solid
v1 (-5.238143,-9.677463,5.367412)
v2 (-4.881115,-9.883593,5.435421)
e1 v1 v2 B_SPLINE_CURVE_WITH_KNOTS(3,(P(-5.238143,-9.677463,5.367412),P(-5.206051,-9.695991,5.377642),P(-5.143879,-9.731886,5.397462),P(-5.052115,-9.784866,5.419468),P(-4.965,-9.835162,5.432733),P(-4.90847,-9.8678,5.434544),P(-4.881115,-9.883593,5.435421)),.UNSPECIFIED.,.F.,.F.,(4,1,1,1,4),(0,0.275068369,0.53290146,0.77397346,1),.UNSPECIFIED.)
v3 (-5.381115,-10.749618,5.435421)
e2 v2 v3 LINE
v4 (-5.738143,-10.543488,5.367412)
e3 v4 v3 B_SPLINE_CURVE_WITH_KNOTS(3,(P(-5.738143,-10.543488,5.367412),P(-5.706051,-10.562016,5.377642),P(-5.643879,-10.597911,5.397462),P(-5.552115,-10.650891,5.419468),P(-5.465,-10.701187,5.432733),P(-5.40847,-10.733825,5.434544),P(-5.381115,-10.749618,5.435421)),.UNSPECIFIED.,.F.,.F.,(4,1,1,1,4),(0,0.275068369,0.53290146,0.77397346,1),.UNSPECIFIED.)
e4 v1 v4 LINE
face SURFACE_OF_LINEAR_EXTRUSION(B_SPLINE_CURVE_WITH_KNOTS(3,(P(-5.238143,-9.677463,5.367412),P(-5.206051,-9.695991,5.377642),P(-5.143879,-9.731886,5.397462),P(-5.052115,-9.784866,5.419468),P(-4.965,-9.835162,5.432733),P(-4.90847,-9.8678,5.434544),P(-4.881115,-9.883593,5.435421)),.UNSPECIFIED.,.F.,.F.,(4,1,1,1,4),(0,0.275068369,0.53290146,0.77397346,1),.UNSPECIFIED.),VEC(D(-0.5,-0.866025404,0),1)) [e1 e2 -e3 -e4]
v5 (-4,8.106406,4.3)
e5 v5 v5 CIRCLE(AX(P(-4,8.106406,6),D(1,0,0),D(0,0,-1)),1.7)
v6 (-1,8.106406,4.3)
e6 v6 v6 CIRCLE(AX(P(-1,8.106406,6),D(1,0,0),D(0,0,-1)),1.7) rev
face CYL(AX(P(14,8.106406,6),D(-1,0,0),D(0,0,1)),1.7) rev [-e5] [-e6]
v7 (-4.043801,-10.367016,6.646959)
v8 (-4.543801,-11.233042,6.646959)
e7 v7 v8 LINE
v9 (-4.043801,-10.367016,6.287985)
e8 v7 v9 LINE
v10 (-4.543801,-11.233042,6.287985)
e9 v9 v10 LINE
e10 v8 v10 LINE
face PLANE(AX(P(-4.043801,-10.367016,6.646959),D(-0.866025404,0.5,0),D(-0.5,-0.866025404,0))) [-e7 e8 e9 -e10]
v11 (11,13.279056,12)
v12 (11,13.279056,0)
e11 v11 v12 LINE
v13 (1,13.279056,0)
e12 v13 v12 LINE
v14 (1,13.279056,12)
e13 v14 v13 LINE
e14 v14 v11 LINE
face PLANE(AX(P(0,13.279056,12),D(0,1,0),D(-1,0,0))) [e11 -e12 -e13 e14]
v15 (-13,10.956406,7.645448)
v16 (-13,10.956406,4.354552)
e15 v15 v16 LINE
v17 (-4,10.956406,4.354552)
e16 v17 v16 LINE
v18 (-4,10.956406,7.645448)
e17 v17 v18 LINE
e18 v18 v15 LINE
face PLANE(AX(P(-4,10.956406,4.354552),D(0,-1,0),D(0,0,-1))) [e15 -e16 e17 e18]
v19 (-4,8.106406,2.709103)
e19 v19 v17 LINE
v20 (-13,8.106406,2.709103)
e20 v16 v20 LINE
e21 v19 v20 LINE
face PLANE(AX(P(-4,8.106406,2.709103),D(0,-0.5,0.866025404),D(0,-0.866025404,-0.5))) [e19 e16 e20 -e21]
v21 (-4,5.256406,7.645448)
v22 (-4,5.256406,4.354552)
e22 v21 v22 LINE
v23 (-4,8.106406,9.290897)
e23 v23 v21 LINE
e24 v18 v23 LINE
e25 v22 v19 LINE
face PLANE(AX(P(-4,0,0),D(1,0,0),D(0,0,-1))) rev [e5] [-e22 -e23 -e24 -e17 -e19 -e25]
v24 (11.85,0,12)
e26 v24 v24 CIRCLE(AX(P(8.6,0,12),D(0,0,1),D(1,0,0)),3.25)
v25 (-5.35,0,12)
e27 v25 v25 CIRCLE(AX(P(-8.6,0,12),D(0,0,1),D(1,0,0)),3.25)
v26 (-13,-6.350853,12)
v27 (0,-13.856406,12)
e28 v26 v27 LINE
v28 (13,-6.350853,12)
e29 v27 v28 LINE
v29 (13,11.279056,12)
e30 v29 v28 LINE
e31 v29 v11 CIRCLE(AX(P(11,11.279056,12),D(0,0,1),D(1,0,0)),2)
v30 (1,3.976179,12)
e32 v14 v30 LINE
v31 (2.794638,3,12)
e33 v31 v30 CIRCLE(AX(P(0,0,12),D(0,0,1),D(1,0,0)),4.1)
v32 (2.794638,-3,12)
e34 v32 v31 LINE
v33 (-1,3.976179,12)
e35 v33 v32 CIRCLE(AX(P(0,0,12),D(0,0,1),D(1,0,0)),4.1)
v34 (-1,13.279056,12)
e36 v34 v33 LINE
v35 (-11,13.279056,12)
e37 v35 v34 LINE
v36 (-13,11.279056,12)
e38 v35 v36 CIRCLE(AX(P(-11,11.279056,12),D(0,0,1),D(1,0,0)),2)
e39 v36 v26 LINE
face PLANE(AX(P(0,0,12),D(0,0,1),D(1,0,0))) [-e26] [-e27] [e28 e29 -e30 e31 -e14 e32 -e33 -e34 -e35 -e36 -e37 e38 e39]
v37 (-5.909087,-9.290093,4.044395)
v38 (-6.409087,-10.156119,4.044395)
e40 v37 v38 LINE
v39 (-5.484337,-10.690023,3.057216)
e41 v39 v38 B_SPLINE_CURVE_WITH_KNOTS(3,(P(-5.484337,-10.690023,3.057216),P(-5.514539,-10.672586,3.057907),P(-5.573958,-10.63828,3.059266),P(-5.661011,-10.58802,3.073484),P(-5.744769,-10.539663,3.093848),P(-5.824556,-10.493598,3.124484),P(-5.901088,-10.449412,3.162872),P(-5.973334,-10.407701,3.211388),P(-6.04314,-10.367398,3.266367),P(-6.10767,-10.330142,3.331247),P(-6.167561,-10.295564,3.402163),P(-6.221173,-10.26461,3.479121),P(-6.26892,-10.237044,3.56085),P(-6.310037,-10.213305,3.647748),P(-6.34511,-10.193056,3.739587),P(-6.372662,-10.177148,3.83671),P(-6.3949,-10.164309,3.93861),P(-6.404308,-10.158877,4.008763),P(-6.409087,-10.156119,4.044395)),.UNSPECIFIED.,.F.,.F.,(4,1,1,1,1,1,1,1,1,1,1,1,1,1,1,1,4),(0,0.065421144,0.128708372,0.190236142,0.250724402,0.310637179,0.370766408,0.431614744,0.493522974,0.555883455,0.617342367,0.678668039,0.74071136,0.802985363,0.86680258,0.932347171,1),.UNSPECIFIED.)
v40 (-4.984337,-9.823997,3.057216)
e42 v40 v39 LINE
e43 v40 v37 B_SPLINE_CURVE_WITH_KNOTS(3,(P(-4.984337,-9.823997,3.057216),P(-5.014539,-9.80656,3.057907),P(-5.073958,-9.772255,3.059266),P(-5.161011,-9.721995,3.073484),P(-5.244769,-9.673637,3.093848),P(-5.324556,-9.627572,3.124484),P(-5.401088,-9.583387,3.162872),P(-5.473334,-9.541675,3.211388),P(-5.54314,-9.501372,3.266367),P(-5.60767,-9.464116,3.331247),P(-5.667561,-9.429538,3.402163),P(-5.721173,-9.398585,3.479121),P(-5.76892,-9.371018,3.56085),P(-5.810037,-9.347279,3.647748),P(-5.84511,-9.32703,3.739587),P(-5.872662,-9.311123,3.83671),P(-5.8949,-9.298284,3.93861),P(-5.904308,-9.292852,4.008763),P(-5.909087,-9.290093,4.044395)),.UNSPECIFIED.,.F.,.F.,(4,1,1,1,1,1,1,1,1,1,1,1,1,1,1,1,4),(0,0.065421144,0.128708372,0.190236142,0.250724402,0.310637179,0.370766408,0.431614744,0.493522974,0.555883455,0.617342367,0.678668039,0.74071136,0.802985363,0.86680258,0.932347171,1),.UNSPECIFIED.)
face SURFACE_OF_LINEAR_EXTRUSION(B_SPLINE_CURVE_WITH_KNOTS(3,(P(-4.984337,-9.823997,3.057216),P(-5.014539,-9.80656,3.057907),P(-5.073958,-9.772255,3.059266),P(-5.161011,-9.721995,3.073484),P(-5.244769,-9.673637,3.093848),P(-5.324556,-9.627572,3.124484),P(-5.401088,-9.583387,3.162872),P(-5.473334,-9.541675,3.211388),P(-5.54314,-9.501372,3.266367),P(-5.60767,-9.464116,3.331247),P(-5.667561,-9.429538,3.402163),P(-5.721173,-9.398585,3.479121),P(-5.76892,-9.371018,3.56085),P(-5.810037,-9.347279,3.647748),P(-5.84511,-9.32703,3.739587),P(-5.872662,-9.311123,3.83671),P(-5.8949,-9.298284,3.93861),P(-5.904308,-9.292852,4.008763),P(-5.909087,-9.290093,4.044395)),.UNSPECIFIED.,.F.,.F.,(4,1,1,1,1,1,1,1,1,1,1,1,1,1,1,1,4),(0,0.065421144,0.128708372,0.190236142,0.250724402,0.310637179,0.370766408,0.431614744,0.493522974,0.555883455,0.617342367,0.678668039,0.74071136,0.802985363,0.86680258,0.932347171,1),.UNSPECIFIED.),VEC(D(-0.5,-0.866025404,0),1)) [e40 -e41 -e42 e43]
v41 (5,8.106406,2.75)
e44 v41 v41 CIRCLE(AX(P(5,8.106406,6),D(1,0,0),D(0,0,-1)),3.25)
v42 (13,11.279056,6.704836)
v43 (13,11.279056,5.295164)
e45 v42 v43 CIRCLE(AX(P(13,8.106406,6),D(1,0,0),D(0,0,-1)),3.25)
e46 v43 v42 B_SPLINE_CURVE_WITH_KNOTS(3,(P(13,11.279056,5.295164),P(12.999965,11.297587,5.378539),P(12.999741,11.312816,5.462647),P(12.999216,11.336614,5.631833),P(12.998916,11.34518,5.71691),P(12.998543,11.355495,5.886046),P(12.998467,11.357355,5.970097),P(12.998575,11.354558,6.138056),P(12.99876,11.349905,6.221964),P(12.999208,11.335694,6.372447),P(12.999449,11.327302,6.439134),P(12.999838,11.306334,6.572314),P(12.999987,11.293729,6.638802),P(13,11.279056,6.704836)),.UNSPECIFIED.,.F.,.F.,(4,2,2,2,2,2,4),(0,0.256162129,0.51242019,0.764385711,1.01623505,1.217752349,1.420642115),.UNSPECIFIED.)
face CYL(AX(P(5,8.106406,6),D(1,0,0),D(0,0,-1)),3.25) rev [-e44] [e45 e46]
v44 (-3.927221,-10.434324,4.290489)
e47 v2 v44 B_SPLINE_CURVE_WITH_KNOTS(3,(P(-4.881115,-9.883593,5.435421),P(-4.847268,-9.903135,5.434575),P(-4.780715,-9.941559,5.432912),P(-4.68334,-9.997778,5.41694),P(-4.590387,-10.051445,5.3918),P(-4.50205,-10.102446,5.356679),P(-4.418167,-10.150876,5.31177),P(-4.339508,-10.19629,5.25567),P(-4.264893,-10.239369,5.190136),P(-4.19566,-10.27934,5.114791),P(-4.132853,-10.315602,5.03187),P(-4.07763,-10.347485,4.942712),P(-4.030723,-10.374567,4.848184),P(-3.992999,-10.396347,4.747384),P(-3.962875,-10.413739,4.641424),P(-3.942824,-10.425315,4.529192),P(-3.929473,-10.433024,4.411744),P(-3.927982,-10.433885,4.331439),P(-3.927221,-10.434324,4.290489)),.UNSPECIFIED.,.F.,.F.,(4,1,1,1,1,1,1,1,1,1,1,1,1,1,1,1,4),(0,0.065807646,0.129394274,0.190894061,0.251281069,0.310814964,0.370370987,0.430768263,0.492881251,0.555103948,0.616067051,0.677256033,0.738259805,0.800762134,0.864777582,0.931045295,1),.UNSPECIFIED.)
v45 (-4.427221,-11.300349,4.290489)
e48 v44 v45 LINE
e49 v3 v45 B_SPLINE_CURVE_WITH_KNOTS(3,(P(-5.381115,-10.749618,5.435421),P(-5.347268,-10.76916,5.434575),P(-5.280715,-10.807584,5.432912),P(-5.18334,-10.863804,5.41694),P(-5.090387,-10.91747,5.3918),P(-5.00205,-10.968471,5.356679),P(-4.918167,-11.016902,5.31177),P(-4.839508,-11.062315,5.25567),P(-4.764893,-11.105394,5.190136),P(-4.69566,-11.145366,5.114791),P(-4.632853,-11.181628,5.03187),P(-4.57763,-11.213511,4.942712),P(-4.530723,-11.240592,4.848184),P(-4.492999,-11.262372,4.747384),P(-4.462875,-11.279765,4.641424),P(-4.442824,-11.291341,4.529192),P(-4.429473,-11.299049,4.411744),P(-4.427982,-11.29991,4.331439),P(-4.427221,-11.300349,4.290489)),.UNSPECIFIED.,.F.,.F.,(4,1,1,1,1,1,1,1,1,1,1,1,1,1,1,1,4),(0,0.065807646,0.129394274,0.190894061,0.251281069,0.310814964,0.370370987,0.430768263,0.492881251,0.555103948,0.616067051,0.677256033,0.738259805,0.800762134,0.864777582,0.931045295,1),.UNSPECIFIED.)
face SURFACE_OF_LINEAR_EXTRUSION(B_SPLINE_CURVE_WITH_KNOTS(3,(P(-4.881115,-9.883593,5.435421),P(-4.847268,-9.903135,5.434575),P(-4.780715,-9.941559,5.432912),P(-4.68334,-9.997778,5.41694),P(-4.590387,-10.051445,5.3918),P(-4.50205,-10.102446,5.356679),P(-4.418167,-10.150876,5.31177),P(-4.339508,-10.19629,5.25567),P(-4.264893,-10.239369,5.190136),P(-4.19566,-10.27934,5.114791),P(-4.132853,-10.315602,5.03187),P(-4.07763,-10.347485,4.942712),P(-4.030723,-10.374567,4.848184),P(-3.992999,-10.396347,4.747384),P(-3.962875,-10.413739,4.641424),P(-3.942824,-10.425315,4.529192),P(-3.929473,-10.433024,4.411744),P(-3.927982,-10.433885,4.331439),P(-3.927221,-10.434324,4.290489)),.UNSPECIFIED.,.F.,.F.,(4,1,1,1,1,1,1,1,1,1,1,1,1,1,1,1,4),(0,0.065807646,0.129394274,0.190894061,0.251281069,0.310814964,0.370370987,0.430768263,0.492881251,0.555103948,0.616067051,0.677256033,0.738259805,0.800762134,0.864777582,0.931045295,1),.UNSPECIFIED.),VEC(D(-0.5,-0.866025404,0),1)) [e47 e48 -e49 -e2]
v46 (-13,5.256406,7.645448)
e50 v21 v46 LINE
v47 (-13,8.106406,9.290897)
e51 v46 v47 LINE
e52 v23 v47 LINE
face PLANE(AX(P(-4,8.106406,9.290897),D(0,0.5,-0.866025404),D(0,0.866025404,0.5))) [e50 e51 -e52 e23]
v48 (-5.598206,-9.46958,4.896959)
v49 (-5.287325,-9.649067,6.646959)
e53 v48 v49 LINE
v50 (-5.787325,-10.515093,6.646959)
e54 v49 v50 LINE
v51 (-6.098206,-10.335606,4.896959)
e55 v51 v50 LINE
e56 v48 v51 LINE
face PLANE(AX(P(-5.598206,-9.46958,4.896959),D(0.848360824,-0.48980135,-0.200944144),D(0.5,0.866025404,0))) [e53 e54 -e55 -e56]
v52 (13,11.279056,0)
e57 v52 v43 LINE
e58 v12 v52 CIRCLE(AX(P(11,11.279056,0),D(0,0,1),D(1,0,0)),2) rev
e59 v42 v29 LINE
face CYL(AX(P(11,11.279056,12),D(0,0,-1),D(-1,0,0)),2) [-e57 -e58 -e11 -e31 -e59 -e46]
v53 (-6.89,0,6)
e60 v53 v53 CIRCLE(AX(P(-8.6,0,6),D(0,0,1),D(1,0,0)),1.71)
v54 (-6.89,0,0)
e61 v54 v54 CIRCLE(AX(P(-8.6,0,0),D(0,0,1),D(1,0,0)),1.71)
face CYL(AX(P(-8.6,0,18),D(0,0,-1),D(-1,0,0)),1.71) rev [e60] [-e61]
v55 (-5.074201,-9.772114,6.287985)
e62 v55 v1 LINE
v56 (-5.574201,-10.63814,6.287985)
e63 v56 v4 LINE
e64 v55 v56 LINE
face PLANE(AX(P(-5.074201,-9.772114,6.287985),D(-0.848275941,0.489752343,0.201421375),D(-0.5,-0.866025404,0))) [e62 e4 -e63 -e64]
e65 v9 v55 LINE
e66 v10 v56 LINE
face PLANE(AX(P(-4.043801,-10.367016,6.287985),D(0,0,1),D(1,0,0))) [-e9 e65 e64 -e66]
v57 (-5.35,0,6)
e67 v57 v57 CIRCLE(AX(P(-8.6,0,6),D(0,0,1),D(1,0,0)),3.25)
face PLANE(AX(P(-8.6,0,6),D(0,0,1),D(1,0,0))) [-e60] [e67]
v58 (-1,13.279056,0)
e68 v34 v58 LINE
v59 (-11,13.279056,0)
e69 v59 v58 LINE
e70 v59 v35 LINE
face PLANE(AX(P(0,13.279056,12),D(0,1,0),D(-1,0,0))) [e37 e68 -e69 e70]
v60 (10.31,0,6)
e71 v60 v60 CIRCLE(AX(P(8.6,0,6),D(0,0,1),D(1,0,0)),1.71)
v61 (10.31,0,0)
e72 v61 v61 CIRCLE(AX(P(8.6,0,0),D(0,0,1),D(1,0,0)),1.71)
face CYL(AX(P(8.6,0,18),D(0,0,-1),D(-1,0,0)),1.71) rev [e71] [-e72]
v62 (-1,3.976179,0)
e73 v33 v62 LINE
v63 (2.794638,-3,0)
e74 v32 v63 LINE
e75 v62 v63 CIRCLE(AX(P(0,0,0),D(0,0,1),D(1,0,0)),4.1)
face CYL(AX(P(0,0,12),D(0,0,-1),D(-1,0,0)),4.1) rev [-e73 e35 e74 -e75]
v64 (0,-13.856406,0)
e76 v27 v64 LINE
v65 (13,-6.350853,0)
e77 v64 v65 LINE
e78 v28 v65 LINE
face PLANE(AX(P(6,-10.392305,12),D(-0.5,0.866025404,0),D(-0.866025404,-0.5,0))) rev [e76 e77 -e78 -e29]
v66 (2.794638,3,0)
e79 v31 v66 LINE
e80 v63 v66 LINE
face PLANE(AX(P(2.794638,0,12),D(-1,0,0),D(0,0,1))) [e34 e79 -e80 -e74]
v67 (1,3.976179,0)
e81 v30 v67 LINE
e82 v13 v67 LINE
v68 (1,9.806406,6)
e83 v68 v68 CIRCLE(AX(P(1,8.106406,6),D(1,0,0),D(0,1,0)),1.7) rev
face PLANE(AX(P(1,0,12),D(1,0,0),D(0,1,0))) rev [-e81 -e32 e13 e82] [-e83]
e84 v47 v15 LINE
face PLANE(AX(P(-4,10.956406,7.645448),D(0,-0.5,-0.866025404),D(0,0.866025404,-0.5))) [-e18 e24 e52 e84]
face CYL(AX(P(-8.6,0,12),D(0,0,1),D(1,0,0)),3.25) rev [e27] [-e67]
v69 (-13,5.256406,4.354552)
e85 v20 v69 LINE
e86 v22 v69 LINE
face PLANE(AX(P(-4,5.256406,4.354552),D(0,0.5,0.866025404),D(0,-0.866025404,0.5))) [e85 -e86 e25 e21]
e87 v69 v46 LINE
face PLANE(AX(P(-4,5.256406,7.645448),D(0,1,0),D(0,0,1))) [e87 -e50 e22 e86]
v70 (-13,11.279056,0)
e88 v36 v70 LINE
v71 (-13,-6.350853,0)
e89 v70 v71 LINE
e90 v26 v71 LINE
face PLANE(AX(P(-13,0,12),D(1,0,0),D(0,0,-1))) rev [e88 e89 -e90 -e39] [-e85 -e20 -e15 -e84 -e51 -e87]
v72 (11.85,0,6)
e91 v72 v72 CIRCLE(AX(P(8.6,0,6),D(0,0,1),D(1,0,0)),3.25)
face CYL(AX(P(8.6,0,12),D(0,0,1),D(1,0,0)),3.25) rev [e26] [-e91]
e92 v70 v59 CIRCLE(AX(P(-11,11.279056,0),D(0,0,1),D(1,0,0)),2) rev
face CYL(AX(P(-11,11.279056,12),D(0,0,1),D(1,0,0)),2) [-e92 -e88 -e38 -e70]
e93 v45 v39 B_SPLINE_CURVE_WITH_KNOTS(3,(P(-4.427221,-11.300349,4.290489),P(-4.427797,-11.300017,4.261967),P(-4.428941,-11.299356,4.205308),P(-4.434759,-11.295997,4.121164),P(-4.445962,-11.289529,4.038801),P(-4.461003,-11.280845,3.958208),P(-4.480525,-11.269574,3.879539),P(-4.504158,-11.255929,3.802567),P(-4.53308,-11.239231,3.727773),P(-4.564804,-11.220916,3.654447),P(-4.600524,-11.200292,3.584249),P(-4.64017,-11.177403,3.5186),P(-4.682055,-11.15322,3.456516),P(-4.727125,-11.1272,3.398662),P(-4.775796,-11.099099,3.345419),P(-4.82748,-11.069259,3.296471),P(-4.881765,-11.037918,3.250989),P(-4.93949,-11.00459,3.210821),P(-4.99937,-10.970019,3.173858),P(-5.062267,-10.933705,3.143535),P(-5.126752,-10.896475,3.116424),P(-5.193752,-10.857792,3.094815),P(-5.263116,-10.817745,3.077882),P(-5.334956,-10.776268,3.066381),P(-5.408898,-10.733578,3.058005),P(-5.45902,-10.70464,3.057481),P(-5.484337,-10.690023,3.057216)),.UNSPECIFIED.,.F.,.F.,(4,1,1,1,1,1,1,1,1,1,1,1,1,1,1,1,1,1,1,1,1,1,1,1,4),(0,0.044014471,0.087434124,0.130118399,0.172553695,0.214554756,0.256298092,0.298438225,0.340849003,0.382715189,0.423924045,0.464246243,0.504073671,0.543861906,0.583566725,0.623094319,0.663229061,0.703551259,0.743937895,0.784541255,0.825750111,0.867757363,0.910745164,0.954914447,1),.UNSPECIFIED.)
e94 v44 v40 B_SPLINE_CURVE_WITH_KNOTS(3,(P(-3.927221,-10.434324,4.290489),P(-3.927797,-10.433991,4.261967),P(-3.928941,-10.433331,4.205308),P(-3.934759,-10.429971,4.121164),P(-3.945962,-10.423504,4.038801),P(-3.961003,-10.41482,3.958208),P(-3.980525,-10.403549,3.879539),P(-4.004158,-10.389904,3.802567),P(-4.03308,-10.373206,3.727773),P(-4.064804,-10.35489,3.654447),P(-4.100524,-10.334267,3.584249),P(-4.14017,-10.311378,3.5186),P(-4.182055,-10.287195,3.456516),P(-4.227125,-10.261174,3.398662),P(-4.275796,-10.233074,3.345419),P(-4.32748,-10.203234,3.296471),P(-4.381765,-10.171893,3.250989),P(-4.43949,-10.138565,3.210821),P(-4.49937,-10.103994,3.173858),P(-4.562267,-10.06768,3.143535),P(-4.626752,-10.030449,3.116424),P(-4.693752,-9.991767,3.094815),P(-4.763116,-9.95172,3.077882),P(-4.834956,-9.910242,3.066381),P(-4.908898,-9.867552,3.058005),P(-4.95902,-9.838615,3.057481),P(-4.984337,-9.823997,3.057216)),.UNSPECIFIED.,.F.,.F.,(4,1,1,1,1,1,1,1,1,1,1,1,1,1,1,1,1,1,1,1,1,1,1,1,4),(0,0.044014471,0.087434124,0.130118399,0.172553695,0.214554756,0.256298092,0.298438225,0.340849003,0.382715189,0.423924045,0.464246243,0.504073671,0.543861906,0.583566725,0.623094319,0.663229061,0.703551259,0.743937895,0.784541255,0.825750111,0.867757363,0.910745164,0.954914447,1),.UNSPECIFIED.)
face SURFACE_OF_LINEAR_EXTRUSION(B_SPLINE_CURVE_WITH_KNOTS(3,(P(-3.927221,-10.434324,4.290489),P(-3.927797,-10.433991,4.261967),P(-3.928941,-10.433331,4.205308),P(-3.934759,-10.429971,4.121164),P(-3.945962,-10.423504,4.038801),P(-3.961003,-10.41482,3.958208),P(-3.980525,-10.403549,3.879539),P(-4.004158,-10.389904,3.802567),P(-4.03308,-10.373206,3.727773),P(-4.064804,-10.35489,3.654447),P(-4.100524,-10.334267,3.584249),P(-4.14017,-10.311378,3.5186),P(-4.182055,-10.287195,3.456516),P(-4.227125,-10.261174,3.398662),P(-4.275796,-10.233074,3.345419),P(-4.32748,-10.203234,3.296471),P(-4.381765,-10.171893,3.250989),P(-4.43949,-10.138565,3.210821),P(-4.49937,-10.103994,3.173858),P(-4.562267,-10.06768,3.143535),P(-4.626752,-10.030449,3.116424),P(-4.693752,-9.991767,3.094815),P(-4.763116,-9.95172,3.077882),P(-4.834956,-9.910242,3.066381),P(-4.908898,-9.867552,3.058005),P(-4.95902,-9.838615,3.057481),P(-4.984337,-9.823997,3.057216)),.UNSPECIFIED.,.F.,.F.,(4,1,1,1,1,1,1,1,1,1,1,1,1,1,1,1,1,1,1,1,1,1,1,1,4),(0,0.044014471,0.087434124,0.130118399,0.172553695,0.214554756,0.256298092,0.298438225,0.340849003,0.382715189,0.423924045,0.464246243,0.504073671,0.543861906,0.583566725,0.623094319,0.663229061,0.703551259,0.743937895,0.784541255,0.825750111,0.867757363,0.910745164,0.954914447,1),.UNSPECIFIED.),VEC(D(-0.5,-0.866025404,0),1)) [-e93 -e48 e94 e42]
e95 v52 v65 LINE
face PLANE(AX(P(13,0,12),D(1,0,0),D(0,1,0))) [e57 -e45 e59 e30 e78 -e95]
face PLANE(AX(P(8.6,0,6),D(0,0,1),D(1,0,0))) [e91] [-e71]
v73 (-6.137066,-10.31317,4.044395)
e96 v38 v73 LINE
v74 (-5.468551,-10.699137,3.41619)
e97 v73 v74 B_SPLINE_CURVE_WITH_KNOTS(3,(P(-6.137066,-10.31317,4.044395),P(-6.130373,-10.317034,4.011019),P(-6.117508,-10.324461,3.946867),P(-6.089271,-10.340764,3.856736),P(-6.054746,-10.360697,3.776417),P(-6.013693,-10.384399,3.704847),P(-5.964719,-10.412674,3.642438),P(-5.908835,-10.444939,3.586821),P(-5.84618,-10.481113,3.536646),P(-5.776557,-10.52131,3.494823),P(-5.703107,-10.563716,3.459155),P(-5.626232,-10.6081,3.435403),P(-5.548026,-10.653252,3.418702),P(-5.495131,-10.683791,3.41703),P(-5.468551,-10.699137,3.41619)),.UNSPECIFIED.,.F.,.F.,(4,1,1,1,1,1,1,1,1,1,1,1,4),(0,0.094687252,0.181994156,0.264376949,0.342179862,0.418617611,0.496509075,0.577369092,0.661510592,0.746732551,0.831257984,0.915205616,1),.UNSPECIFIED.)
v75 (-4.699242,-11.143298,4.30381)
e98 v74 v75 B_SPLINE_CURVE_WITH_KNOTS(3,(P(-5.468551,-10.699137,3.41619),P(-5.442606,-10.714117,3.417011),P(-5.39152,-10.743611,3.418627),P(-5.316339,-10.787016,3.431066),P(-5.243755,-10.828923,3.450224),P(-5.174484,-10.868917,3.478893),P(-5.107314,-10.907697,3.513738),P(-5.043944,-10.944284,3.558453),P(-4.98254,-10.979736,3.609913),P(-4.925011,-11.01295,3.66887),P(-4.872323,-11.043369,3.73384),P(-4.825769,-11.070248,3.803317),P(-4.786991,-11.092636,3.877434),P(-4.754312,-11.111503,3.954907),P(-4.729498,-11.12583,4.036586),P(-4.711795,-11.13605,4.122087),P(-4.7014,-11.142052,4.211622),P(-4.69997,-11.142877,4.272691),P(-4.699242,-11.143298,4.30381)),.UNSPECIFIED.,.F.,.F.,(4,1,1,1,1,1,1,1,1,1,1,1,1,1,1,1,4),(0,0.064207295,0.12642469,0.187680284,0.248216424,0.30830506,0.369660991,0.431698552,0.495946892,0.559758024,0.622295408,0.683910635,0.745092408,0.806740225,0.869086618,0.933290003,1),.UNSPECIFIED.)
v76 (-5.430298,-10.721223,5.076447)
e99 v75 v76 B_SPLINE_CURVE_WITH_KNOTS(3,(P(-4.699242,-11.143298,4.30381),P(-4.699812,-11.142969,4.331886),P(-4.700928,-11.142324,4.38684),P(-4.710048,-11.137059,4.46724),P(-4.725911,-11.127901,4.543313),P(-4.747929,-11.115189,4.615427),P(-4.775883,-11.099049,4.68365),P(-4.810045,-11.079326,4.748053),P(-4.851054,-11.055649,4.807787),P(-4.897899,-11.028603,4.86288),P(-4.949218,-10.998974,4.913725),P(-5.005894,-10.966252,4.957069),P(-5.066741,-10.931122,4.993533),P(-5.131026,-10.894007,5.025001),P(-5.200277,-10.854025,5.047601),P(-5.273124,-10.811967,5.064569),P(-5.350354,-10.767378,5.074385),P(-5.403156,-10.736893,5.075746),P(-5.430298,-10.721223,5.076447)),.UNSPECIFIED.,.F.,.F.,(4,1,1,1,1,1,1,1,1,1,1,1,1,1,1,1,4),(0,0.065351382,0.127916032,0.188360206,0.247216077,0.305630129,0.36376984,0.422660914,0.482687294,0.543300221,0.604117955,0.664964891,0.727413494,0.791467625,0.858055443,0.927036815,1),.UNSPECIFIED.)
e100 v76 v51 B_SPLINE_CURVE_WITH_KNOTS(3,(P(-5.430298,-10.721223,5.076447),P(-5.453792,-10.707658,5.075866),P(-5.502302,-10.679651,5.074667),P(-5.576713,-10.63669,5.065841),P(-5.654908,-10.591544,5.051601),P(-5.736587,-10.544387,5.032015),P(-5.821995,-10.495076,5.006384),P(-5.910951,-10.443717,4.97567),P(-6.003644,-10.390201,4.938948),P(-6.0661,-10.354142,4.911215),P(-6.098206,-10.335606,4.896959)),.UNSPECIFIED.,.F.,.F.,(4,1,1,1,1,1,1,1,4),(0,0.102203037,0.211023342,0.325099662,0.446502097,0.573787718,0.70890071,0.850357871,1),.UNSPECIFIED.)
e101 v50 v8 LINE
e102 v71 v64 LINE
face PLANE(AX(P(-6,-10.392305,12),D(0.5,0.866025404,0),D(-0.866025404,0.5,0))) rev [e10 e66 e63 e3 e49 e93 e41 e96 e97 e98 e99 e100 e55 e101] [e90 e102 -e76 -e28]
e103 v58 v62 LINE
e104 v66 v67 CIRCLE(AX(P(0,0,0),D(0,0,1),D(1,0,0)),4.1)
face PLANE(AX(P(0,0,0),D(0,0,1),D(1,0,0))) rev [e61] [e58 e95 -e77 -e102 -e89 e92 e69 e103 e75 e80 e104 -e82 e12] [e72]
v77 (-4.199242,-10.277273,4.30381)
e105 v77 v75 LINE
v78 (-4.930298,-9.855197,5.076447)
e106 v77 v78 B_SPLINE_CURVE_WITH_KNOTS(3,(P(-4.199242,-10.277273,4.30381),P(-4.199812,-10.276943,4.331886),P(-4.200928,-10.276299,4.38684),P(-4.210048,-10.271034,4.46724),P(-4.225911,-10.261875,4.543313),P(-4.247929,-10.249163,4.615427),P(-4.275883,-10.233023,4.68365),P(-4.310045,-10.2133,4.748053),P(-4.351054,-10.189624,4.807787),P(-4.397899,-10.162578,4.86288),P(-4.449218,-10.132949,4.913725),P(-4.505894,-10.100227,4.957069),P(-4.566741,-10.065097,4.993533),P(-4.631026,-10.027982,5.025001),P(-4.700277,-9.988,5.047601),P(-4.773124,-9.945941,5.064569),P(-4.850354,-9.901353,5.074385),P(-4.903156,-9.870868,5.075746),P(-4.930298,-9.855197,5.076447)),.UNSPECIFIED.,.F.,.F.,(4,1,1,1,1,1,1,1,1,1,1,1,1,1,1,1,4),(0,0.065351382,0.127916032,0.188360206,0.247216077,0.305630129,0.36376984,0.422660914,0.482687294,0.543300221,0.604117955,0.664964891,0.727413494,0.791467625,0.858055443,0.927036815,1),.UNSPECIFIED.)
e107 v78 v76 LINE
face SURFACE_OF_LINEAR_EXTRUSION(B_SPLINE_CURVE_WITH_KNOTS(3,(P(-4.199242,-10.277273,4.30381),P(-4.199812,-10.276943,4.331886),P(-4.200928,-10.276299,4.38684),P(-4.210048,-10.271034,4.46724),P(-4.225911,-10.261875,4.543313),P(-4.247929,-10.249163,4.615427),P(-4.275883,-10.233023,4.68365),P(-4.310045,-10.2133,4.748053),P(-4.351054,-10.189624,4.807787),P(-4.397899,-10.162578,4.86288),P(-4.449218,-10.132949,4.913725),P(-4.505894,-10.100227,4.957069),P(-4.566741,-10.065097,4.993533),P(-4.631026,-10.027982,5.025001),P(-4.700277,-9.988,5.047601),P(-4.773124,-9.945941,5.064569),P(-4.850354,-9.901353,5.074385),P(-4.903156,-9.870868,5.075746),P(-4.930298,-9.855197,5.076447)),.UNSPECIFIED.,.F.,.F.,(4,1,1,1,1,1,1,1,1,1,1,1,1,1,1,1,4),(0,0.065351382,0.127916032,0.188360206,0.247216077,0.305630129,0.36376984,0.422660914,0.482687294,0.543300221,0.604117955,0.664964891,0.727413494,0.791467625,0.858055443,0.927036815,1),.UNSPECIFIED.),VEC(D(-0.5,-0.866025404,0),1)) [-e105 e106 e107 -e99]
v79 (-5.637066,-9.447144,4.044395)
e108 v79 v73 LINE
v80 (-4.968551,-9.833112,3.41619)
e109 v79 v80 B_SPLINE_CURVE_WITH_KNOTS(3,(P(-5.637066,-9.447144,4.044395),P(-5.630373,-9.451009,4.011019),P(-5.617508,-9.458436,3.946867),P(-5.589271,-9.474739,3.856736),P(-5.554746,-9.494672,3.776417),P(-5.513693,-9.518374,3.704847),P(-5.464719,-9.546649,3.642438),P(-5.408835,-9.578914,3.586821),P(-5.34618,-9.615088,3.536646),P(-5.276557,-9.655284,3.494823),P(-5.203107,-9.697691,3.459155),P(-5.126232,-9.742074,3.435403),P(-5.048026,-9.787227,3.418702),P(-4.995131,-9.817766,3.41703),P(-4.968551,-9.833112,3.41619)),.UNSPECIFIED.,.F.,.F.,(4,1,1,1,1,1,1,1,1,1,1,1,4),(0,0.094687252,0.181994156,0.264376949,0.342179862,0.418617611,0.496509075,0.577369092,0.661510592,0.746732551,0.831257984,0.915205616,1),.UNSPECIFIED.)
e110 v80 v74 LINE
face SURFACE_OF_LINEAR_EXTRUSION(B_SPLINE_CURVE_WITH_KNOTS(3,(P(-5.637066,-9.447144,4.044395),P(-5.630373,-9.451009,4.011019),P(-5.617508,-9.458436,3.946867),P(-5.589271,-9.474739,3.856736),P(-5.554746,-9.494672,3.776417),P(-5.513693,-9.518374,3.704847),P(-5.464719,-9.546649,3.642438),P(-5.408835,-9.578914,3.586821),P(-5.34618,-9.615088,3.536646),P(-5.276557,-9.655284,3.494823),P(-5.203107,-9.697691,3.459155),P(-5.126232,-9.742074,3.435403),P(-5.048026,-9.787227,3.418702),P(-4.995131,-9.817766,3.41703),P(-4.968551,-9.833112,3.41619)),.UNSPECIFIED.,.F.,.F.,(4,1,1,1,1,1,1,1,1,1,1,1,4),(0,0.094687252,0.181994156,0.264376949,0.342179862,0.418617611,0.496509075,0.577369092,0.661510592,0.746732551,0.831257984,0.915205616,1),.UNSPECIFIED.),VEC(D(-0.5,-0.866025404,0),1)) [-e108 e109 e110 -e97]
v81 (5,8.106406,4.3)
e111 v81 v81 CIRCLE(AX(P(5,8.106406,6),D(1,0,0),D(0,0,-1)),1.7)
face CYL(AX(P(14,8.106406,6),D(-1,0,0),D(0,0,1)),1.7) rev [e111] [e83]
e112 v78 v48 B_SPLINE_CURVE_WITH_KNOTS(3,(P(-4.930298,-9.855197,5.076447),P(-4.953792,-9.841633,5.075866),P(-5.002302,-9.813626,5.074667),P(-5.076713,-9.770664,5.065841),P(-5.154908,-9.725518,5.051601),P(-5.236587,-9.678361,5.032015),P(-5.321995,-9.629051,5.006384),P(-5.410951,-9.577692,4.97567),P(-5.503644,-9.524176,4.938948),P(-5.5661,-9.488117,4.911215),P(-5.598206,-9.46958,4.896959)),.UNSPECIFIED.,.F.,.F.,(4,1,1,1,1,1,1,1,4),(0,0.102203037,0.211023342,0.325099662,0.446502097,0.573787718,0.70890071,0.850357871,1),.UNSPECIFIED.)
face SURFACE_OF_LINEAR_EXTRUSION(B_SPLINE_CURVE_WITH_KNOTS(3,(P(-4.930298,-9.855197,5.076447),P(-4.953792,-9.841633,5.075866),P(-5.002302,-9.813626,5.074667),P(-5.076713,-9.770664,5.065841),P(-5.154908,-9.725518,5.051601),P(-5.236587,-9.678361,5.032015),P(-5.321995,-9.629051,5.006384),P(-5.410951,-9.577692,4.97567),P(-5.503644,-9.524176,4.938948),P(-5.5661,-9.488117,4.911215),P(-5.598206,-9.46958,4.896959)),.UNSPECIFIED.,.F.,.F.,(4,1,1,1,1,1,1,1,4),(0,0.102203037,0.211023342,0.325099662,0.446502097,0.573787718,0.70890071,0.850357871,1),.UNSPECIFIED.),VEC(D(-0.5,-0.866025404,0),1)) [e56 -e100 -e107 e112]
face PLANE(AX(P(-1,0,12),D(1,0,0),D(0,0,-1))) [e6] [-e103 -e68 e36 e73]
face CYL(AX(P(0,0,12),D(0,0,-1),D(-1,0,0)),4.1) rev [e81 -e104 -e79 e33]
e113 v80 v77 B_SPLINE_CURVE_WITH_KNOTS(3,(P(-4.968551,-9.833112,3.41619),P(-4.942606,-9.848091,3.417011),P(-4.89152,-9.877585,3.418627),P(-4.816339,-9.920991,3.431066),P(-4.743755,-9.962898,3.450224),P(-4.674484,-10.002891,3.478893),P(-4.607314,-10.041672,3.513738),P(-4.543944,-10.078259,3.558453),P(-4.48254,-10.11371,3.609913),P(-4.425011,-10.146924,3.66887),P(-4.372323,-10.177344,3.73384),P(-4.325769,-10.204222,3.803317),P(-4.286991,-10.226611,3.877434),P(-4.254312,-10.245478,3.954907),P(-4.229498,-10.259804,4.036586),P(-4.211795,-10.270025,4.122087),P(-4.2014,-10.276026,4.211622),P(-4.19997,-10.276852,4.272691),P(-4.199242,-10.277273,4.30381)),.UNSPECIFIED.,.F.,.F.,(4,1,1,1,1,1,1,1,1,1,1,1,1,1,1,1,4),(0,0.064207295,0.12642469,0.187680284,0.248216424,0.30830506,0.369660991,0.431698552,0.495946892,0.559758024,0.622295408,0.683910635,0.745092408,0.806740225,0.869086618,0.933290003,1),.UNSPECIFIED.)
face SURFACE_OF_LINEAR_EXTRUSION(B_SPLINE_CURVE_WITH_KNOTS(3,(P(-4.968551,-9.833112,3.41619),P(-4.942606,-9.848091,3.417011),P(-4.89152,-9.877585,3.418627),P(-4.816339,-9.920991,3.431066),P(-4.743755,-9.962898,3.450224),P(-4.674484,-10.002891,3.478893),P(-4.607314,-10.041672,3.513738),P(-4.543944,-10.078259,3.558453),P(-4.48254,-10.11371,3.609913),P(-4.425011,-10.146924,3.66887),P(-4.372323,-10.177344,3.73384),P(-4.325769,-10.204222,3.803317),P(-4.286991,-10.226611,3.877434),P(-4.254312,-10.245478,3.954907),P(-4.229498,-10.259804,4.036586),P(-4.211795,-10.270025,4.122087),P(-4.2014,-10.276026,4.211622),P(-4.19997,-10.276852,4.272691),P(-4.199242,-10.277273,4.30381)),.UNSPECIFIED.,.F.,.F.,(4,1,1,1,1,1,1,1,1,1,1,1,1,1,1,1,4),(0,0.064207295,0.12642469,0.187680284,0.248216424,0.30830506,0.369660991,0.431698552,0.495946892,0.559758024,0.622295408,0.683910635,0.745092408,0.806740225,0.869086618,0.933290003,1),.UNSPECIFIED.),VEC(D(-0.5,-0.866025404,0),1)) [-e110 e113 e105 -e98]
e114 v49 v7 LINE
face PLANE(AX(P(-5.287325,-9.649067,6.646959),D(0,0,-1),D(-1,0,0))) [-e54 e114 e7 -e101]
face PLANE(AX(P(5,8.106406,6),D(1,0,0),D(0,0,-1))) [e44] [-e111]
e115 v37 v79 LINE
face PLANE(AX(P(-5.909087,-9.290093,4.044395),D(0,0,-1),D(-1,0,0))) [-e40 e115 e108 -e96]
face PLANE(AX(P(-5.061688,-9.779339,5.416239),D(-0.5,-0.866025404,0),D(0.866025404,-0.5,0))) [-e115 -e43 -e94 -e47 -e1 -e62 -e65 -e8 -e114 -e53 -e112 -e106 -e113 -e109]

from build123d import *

# Parameters (mm, degrees)
BOSS_EXTRUDE1_DEPTH            = 12
SKETCH41_R                     = 1.71
CUT_EXTRUDE7_DEPTH             = 18
CBORE_FOR_M3_SHCS1_D           = 3.4
CBORE_FOR_M3_SHCS1_CBORE_D     = 6.5
CBORE_FOR_M3_SHCS1_CBORE_DEPTH = 3
CBORE_FOR_M3_SHCS2_D           = 3.4
CBORE_FOR_M3_SHCS2_CBORE_D     = 6.5
CBORE_FOR_M3_SHCS2_CBORE_DEPTH = 3
CUT_EXTRUDE10_DEPTH            = 15
CUT_EXTRUDE10_DEPTH_BACK       = 15
SKETCH52_R                     = 1.7
SKETCH58_R                     = 3.25
CUT_EXTRUDE11_DEPTH            = 8
CUT_EXTRUDE12_DEPTH            = 4
CUT_EXTRUDE12_DEPTH_BACK       = 6
FILLET1_R                      = 2
SKETCH61_R                     = 3.25
CUT_EXTRUDE13_DEPTH            = 6
CUT_EXTRUDE14_DEPTH            = 1


with BuildPart() as part:
    # Sketch1 → Boss-Extrude1 (new body)
    with BuildSketch(Plane(origin=(0, 0, 0), x_dir=(0, 1, 0), z_dir=(0, 0, 1))):
        with BuildLine():
            Line((-6.350852961, -13), (13.279056191, -13))
            Line((13.279056191, -13), (13.279056191, -1))
            Line((13.279056191, -1), (3.97617907, -1))
            ThreePointArc((3.97617907, -1), (3.601659304, -1.959094244), (3, -2.794637722))
            Line((3, -2.794637722), (-3, -2.794637722))
            ThreePointArc((-3, -2.794637722), (-3.815101571, -1.501665742), (-4.1, 0))
            ThreePointArc((-4.1, 0), (-0.503818326, 4.06892702), (3.97617907, 1))
            Line((3.97617907, 1), (13.279056191, 1))
            Line((13.279056191, 1), (13.279056191, 13))
            Line((13.279056191, 13), (-6.350852961, 13))
            Line((-6.350852961, 13), (-13.856406461, 0))
            Line((-13.856406461, 0), (-6.350852961, -13))
        make_face()
    extrude(amount=BOSS_EXTRUDE1_DEPTH)

    # Sketch41 → Cut-Extrude7 (cut)
    with BuildSketch(Plane(origin=(0, 0, 0), x_dir=(0, 1, 0), z_dir=(0, 0, 1))):
        with Locations(Location((0, 8.6, 0), (0, 0, 270))):
            Circle(SKETCH41_R)
        with Locations(Location((0, -8.6, 0), (0, 0, 270))):
            Circle(SKETCH41_R)
    extrude(amount=CUT_EXTRUDE7_DEPTH, mode=Mode.SUBTRACT)

    # CBORE for M3 SHCS1 (through all)
    with Locations(Plane(origin=(-8.6, 0, 12), x_dir=(1, 0, 0), z_dir=(0, 0, 1))):
        with Locations((0, 0)):
            CounterBoreHole(CBORE_FOR_M3_SHCS1_D / 2, CBORE_FOR_M3_SHCS1_CBORE_D / 2, CBORE_FOR_M3_SHCS1_CBORE_DEPTH)

    # CBORE for M3 SHCS2 (through all)
    with Locations(Plane(origin=(8.6, 0, 12), x_dir=(1, 0, 0), z_dir=(0, 0, 1))):
        with Locations((0, 0)):
            CounterBoreHole(CBORE_FOR_M3_SHCS2_D / 2, CBORE_FOR_M3_SHCS2_CBORE_D / 2, CBORE_FOR_M3_SHCS2_CBORE_DEPTH)

    # Sketch52 → Cut-Extrude10 (cut, two sides: drawn at the far end of the back side and taken through both)
    with BuildSketch(Plane.YZ.offset(-1).offset(-CUT_EXTRUDE10_DEPTH_BACK)):
        with Locations((8.106406461, 6)):
            Circle(SKETCH52_R)
    extrude(amount=CUT_EXTRUDE10_DEPTH + CUT_EXTRUDE10_DEPTH_BACK, mode=Mode.SUBTRACT)

    # Sketch58 → Cut-Extrude11 (cut)
    with BuildSketch(Plane.YZ.offset(13)):
        with Locations(Location((8.106406461, 6, 0), (0, 0, 270))):
            Circle(SKETCH58_R)
    extrude(amount=-CUT_EXTRUDE11_DEPTH, mode=Mode.SUBTRACT)

    # Sketch60 → Cut-Extrude12 (cut, two sides: drawn at the far end of the back side and taken through both)
    with BuildSketch(Plane.YZ.offset(-8).offset(-CUT_EXTRUDE12_DEPTH_BACK)):
        Polygon((8.106406461, 2.709103466), (10.956406461, 4.354551733), (10.956406461, 7.645448267), (8.106406461, 9.290896534), (5.256406461, 7.645448267), (5.256406461, 4.354551733), align=None)
    extrude(amount=CUT_EXTRUDE12_DEPTH + CUT_EXTRUDE12_DEPTH_BACK, mode=Mode.SUBTRACT)

    # Fillet1
    # the kernel refuses this fillet: 2 mm, written as the material it takes off along each edge
    with BuildSketch(Plane(origin=(13, 13.279056191, -5), x_dir=(0, -1, 0), z_dir=(0, 0, 1))) as fillet1_piece_1:
        with BuildLine():
            CenterArc((FILLET1_R, -FILLET1_R), FILLET1_R, 90, 90)
            Line((0, -FILLET1_R), (0, 0))
            Line((0, 0), (FILLET1_R, 0))
        make_face()
    extrude(amount=22, mode=Mode.SUBTRACT)
    with BuildSketch(Plane(origin=(-13, 13.279056191, -5), x_dir=(0, -1, 0), z_dir=(0, 0, 1))) as fillet1_piece_2:
        with BuildLine():
            CenterArc((FILLET1_R, FILLET1_R), FILLET1_R, 180, 90)
            Line((0, FILLET1_R), (0, 0))
            Line((0, 0), (FILLET1_R, 0))
        make_face()
    extrude(amount=22, mode=Mode.SUBTRACT)

    # Sketch61 → Cut-Extrude13 (cut)
    with BuildSketch(Plane(origin=(0, 0, 12), x_dir=(0, 1, 0), z_dir=(0, 0, 1))):
        with Locations(Location((0, 8.6, 0), (0, 0, 270))):
            Circle(SKETCH61_R)
        with Locations(Location((0, -8.6, 0), (0, 0, 270))):
            Circle(SKETCH61_R)
    extrude(amount=-CUT_EXTRUDE13_DEPTH, mode=Mode.SUBTRACT)

    # Sketch62 → Cut-Extrude14 (cut)
    with BuildSketch(Plane(origin=(-6, -10.392304845, 0), x_dir=(0.8660254037844386, -0.5000000000000001, 0), z_dir=(-0.5000000000000001, -0.8660254037844386, 0))):
        with BuildLine():
            Line((1.681473513, 6.646959362), (1.681473513, 6.287985003))
            Line((1.681473513, 6.287985003), (0.491669827, 6.287985003))
            Line((0.491669827, 6.287985003), (0.302366943, 5.367412086))
            add(Edge.make_bspline(
                [(0.302366943, 5.367412086), (0.339422817, 5.377642358), (0.411212713, 5.397461892), (0.517172574, 5.419467662), (0.617764777, 5.432733106), (0.683040148, 5.434544417), (0.714626558, 5.435420901)],
                knots=[0, 0, 0, 0, 1.100273476, 2.13160584, 3.095893838, 4, 4, 4, 4], degree=3))
            add(Edge.make_bspline(
                [(0.714626558, 5.435420901), (0.753710298, 5.434574965), (0.830558695, 5.432911644), (0.942997642, 5.416939795), (1.050330535, 5.39179988), (1.152332906, 5.356679358), (1.249193456, 5.311769625), (1.340021018, 5.255669685), (1.426178931, 5.190136353), (1.506121525, 5.114791341), (1.578645833, 5.031869725), (1.642411822, 4.942711854), (1.696574413, 4.848184192), (1.740135168, 4.747383583), (1.774919502, 4.641424429), (1.798071497, 4.529191847), (1.813488206, 4.411743727), (1.815210592, 4.331439157), (1.816088898, 4.29048901)],
                knots=[0, 0, 0, 0, 1.052922333, 2.070308379, 3.05430497, 4.020497103, 4.973039431, 5.925935799, 6.892292201, 7.88610001, 8.88166317, 9.857072816, 10.836096531, 11.812156883, 12.81219415, 13.836441305, 14.89672472, 16, 16, 16, 16], degree=3))
            add(Edge.make_bspline(
                [(1.816088898, 4.29048901), (1.815423823, 4.261966789), (1.81410266, 4.205307802), (1.807384072, 4.121163601), (1.794448356, 4.038800768), (1.777080632, 3.958208376), (1.754538214, 3.879539004), (1.72724916, 3.802567476), (1.693853133, 3.727772869), (1.657221758, 3.654447474), (1.61597528, 3.584248967), (1.570196772, 3.51859998), (1.521831281, 3.456515699), (1.469789896, 3.398661966), (1.4135889, 3.345418948), (1.353908934, 3.296470667), (1.291226215, 3.250989336), (1.224570972, 3.210821141), (1.155428489, 3.173858185), (1.082800272, 3.143534648), (1.008339572, 3.116424119), (0.930974696, 3.094814592), (0.850880883, 3.077882037), (0.767926108, 3.066381437), (0.682545438, 3.058004999), (0.624670425, 3.057480642), (0.595435853, 3.057215772)],
                knots=[0, 0, 0, 0, 1.056347294, 2.098418968, 3.122841568, 4.141288669, 5.149314143, 6.15115421, 7.162517403, 8.180376062, 9.185164535, 10.17417709, 11.141909838, 12.097768115, 13.052685741, 14.0056014, 14.954263652, 15.917497458, 16.885230207, 17.854509472, 18.828990115, 19.81800267, 20.826176721, 21.857883937, 22.917946725, 24, 24, 24, 24], degree=3))
            add(Edge.make_bspline(
                [(0.595435853, 3.057215772), (0.560561672, 3.05790661), (0.491950842, 3.059265752), (0.391430275, 3.073484238), (0.294715669, 3.093848154), (0.202585568, 3.124484424), (0.114214304, 3.162871719), (0.030791586, 3.21138789), (-0.04981419, 3.266366994), (-0.124326227, 3.331247347), (-0.19348234, 3.402163029), (-0.255388849, 3.47912067), (-0.310522426, 3.560850112), (-0.358000173, 3.647748266), (-0.398498194, 3.739586797), (-0.430313182, 3.836709798), (-0.455991537, 3.938609802), (-0.466854958, 4.008763312), (-0.472372641, 4.04439526)],
                knots=[0, 0, 0, 0, 1.0467383, 2.05933395, 3.04377827, 4.011590433, 4.970194871, 5.932262533, 6.905835911, 7.896367577, 8.894135286, 9.877477877, 10.858688626, 11.851381753, 12.8477658, 13.868841284, 14.917554742, 16, 16, 16, 16], degree=3))
            Line((-0.472372641, 4.04439526), (-0.158270076, 4.04439526))
            add(Edge.make_bspline(
                [(-0.158270076, 4.04439526), (-0.150541519, 4.011018807), (-0.135686803, 3.946867412), (-0.103081054, 3.856736071), (-0.063215178, 3.776416847), (-0.01581083, 3.704847264), (0.040739201, 3.642438267), (0.105268629, 3.586821205), (0.177616353, 3.536646075), (0.258009582, 3.494823308), (0.342822662, 3.459154555), (0.431589872, 3.43540286), (0.521894218, 3.418701967), (0.582972588, 3.417030206), (0.61366502, 3.416190131)],
                knots=[0, 0, 0, 0, 1.136247022, 2.183929868, 3.172523383, 4.106158343, 5.02341133, 5.958108904, 6.928429099, 7.938127109, 8.96079061, 9.975095812, 10.982467395, 12, 12, 12, 12], degree=3))
            add(Edge.make_bspline(
                [(0.61366502, 3.416190131), (0.643623464, 3.417010909), (0.702611886, 3.418627028), (0.789423273, 3.43106604), (0.873236147, 3.450223611), (0.953223504, 3.478893466), (1.030785044, 3.513738184), (1.103958814, 3.55845326), (1.174861691, 3.609913279), (1.241289825, 3.668869909), (1.302129274, 3.733839603), (1.355885395, 3.803316997), (1.400662308, 3.877433843), (1.438396417, 3.954906996), (1.467049716, 4.036585553), (1.487490697, 4.122086729), (1.499493756, 4.211621709), (1.501144936, 4.272691019), (1.501986334, 4.303810324)],
                knots=[0, 0, 0, 0, 1.027316725, 2.022795036, 3.002884548, 3.971462791, 4.93288096, 5.914575861, 6.907176829, 7.935150275, 8.956128384, 9.956726525, 10.942570165, 11.921478529, 12.907843606, 13.90538589, 14.932640048, 16, 16, 16, 16], degree=3))
            add(Edge.make_bspline(
                [(1.501986334, 4.303810324), (1.501327854, 4.331886075), (1.500038975, 4.386840364), (1.489508404, 4.467239571), (1.471191432, 4.543312613), (1.445767552, 4.615426847), (1.413488044, 4.683650289), (1.374041732, 4.74805335), (1.326688334, 4.807787183), (1.272596445, 4.862879736), (1.213338404, 4.913724611), (1.147894662, 4.957068698), (1.077634735, 4.993532615), (1.003405136, 5.025000614), (0.923440237, 5.047601359), (0.839323605, 5.064569245), (0.750146897, 5.074384607), (0.689176208, 5.075746496), (0.657835693, 5.076446542)],
                knots=[0, 0, 0, 0, 1.045622112, 2.046656509, 3.013763289, 3.955457236, 4.890082067, 5.820317437, 6.762574623, 7.722996705, 8.69280354, 9.665887285, 10.63943826, 11.638615906, 12.663482002, 13.728887084, 14.832589034, 16, 16, 16, 16], degree=3))
            add(Edge.make_bspline(
                [(0.657835693, 5.076446542), (0.630706764, 5.07586595), (0.574692409, 5.074667177), (0.488769582, 5.06584068), (0.398477859, 5.051601386), (0.304163363, 5.032015138), (0.205542855, 5.006384062), (0.102824455, 4.975669561), (-0.004207812, 4.938947562), (-0.076325536, 4.911215348), (-0.113398282, 4.896959362)],
                knots=[0, 0, 0, 0, 0.817624296, 1.688186739, 2.600797293, 3.572016777, 4.590301741, 5.671205678, 6.80286297, 8, 8, 8, 8], degree=3))
            Line((-0.113398282, 4.896959362), (0.245576077, 6.646959362))
            Line((0.245576077, 6.646959362), (1.681473513, 6.646959362))
        make_face()
    extrude(amount=-CUT_EXTRUDE14_DEPTH, mode=Mode.SUBTRACT)


solid = part.part
